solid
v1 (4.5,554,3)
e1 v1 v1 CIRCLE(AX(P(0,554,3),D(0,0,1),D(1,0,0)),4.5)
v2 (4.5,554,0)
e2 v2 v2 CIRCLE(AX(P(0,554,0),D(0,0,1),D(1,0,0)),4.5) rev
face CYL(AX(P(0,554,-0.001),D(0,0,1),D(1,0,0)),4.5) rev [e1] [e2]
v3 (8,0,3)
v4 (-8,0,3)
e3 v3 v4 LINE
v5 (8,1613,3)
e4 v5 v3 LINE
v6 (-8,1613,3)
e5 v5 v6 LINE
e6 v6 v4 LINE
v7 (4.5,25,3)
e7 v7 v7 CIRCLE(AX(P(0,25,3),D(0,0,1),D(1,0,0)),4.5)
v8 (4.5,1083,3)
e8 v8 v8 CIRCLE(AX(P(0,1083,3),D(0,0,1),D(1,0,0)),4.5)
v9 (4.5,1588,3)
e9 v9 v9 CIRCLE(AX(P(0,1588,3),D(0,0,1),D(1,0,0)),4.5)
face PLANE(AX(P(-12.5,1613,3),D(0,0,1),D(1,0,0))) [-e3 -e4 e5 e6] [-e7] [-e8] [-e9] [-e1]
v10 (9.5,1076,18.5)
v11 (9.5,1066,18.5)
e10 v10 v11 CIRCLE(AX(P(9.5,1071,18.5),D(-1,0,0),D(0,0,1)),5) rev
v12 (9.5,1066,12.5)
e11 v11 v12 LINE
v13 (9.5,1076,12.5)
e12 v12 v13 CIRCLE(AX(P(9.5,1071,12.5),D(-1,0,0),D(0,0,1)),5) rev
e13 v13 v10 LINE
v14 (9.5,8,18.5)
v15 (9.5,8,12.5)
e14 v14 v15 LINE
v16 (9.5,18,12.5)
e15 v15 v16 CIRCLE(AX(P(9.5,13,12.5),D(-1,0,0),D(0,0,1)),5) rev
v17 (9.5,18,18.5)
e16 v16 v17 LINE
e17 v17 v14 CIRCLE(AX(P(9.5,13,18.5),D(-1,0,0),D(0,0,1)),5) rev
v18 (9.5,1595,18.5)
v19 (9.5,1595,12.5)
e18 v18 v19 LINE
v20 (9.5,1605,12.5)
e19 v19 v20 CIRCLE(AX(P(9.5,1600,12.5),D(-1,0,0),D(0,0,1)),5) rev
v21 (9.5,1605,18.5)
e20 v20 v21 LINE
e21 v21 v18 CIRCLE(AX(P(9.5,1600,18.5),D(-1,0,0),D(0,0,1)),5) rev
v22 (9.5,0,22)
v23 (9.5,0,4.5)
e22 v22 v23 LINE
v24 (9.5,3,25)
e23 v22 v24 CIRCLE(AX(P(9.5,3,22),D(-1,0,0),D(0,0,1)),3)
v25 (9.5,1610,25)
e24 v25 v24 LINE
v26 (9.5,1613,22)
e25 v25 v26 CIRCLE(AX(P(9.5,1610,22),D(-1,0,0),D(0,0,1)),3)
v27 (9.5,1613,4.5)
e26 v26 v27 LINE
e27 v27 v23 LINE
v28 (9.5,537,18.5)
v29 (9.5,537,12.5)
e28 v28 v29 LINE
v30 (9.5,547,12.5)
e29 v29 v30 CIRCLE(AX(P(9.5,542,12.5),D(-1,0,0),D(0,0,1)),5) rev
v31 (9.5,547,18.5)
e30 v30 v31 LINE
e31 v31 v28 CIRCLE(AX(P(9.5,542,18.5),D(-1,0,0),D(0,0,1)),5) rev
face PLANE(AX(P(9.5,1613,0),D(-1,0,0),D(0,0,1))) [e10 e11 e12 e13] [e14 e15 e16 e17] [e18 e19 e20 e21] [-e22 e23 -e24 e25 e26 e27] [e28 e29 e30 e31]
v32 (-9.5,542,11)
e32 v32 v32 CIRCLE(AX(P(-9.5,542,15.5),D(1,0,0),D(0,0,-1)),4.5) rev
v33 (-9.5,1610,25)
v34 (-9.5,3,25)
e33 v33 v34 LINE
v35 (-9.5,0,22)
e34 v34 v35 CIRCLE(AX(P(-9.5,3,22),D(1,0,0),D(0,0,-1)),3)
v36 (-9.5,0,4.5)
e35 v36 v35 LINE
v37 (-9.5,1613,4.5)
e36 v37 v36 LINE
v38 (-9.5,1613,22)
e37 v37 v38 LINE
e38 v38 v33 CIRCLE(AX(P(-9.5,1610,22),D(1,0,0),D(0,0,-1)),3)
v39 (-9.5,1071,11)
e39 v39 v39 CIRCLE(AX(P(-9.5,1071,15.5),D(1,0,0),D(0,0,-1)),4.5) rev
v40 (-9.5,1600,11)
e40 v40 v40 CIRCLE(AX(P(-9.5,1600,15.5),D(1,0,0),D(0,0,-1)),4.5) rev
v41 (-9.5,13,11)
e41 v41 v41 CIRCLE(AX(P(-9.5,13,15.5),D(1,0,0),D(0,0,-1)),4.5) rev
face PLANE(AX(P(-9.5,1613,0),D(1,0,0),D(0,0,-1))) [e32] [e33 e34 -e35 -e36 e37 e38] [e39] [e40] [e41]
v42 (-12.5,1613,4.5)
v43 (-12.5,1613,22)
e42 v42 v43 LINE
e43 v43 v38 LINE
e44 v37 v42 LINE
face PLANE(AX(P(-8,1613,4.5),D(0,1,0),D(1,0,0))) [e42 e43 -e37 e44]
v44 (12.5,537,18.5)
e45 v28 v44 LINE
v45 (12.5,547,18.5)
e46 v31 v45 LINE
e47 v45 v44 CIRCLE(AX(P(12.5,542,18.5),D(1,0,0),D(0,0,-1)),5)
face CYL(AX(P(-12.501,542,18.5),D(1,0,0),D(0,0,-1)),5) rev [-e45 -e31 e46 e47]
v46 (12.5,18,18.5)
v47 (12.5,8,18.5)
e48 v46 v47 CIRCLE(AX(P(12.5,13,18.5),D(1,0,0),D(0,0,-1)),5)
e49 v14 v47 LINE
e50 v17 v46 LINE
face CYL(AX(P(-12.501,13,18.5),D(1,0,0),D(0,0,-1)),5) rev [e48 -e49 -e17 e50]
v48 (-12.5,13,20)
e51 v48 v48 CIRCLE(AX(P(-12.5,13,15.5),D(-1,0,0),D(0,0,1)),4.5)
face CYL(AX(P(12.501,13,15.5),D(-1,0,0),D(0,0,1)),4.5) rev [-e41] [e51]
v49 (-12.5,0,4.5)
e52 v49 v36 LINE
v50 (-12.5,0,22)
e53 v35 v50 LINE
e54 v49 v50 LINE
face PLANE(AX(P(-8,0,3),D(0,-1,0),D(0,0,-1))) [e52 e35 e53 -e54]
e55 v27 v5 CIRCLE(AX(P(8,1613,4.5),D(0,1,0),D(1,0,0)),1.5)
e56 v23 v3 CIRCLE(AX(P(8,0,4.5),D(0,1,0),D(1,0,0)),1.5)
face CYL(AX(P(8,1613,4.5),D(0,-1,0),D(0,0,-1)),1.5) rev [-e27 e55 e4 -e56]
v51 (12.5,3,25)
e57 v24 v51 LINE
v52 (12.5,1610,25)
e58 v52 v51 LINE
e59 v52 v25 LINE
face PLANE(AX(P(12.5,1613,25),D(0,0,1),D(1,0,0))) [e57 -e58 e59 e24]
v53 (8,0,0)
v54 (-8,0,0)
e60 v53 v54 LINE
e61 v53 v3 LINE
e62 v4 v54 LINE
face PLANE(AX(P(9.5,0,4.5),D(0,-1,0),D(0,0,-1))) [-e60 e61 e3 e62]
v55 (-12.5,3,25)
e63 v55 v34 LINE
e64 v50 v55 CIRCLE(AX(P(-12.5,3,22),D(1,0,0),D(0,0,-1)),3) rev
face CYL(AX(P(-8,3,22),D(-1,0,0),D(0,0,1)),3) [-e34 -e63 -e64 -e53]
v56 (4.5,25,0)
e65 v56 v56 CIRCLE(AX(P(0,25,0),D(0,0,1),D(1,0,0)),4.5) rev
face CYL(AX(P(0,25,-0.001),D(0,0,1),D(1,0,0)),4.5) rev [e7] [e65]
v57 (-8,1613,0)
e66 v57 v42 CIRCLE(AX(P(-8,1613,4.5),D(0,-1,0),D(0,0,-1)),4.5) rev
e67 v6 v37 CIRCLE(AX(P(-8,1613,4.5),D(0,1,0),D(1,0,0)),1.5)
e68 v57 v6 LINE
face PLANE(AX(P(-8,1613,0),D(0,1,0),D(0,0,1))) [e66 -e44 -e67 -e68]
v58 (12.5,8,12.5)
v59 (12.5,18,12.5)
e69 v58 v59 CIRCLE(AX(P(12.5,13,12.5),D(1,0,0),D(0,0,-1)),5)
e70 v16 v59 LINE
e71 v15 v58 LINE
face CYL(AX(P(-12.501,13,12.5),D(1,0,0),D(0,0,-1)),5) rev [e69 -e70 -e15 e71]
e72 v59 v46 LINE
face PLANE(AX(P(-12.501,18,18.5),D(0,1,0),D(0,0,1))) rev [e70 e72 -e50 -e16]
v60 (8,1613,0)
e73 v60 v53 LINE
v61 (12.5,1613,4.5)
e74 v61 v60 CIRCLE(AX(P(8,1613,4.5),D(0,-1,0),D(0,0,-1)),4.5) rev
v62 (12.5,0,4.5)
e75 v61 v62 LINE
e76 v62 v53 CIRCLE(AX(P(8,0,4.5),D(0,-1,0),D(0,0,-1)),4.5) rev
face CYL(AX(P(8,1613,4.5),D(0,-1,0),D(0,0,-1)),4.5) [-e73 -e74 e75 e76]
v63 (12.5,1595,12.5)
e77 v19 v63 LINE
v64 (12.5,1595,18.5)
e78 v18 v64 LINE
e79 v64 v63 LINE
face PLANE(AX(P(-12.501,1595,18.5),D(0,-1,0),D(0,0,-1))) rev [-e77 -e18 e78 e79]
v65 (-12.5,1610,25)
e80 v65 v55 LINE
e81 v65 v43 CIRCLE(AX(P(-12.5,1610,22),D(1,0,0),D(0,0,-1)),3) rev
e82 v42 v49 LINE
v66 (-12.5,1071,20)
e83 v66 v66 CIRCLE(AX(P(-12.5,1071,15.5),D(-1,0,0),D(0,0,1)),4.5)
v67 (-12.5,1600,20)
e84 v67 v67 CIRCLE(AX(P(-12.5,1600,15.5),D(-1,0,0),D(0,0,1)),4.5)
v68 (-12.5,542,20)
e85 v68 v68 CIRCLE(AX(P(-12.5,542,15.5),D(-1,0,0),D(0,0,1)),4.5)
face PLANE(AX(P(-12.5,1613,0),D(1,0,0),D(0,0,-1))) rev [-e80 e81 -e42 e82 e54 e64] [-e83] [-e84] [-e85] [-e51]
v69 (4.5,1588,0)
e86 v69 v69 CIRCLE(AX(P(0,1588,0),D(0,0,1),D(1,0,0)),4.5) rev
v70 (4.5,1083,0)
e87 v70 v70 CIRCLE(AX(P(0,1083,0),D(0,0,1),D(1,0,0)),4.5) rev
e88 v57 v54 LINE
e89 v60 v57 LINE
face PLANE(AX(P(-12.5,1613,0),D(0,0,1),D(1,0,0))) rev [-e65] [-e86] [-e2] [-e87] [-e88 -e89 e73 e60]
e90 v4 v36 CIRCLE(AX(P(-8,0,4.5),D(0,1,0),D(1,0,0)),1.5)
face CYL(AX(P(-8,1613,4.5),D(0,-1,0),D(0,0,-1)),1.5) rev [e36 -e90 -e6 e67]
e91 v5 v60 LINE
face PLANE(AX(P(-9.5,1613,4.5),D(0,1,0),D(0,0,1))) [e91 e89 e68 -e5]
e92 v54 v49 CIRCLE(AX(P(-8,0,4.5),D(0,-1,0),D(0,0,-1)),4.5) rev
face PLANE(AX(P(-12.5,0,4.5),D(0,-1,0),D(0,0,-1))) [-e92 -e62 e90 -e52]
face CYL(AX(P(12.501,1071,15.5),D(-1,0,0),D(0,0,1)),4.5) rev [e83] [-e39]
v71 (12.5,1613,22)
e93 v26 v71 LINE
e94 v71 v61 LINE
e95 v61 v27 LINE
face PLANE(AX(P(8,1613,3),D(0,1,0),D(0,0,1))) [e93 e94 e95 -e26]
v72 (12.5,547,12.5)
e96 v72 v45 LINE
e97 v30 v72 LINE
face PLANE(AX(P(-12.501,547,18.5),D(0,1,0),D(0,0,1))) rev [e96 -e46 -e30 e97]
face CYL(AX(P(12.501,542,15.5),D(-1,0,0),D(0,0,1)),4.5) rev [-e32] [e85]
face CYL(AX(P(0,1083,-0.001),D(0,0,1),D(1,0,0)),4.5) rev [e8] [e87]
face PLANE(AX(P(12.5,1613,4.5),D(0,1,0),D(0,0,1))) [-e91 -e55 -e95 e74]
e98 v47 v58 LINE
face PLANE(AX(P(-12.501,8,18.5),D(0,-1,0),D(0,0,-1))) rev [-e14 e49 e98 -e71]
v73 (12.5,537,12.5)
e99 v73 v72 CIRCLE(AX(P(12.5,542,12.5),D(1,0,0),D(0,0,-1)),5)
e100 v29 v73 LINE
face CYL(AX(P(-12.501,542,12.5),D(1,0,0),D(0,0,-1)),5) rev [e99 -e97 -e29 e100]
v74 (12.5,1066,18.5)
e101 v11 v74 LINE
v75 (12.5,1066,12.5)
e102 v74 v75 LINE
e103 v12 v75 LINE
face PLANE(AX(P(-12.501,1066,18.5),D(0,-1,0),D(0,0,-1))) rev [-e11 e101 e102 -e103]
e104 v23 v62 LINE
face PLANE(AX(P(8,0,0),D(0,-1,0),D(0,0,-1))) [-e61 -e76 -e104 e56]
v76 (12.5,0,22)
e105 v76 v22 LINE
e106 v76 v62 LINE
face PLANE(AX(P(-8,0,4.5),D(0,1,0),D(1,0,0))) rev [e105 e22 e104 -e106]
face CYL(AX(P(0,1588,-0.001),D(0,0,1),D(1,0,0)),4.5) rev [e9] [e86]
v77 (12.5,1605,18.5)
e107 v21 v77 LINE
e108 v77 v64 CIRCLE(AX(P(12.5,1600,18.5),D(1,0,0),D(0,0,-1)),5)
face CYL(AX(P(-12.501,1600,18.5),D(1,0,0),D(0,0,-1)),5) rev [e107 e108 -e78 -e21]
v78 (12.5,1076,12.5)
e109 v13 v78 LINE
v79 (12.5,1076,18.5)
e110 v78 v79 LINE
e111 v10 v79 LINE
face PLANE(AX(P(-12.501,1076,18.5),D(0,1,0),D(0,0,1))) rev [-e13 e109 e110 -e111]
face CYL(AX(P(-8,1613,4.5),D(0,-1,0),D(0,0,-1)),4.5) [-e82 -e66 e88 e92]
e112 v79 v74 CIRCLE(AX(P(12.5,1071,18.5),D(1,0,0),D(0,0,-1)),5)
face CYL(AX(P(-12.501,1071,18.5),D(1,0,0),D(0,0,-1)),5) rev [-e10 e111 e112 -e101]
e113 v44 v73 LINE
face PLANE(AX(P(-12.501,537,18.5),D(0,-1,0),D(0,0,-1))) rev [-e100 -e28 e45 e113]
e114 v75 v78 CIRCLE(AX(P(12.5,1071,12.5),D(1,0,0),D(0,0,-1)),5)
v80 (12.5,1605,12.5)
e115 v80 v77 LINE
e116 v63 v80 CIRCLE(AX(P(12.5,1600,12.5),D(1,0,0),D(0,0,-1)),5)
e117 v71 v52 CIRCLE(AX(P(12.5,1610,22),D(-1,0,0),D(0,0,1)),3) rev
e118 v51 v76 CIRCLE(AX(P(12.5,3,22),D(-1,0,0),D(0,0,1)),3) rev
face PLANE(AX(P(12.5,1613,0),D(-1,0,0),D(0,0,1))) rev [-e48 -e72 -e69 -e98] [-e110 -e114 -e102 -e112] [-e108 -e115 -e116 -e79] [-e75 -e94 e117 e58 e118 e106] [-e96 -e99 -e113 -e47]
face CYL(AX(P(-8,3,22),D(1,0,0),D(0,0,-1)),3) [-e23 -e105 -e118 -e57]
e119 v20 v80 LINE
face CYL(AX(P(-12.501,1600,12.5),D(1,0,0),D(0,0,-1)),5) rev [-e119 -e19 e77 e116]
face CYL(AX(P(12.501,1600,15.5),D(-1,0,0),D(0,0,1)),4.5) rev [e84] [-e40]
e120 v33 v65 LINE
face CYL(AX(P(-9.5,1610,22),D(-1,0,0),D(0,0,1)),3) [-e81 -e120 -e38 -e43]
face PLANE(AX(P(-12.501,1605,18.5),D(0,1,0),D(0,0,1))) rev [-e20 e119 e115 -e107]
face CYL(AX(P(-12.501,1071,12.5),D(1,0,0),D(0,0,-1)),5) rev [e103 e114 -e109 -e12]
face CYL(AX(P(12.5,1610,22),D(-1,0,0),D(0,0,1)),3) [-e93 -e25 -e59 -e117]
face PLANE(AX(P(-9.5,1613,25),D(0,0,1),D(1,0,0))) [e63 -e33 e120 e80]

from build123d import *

# Parameters (mm, degrees)
BASE_FLANGE1_DEPTH = 1613
CUT_EXTRUDE1_REACH = 1615.387
SKETCH6_R          = 4.5
FILLET1_R          = 3
CUT_EXTRUDE2_REACH = 1615.387
LPATTERN1_COUNT    = 4
LPATTERN1_PITCH    = 529
CUT_EXTRUDE3_REACH = 1615.198
SKETCH11_R         = 4.5
LPATTERN2_COUNT    = 3
LPATTERN2_PITCH    = 529
CUT_EXTRUDE4_REACH = 1615.198
SKETCH12_R         = 4.5


# Sheet-metal steps are written as plain solids
with BuildPart() as part:
    # Sketch1 → Base-Flange1 (new body)
    with BuildSketch(Plane(origin=(0, 0, 0), x_dir=(1, 0, 0), z_dir=(0, 1, 0))):
        with BuildLine():
            Line((-12.5, -25), (-12.5, -4.5))
            ThreePointArc((-12.5, -4.5), (-11.181980515, -1.318019485), (-8, 0))
            Line((-8, 0), (8, 0))
            ThreePointArc((8, 0), (11.181980515, -1.318019485), (12.5, -4.5))
            Line((12.5, -4.5), (12.5, -25))
            Line((12.5, -25), (9.5, -25))
            Line((9.5, -25), (9.5, -4.5))
            ThreePointArc((9.5, -4.5), (9.060660172, -3.439339828), (8, -3))
            Line((8, -3), (-8, -3))
            ThreePointArc((-8, -3), (-9.060660172, -3.439339828), (-9.5, -4.5))
            Line((-9.5, -4.5), (-9.5, -25))
            Line((-9.5, -25), (-12.5, -25))
        make_face()
    extrude(amount=BASE_FLANGE1_DEPTH)

    # Sketch6 → Cut-Extrude1 (cut, up to next)
    with BuildSketch(Plane.ZY.offset(12.5), mode=Mode.PRIVATE) as cut_extrude1_sk1:
        with Locations((15.5, 13)):
            Circle(SKETCH6_R)
    cut_extrude1_tool1 = extrude(cut_extrude1_sk1.sketch, amount=-CUT_EXTRUDE1_REACH, mode=Mode.PRIVATE) & part.part
    cut_extrude1 = cut_extrude1_tool1.solids().sort_by_distance((-12.5, 13, 15.5))[0]
    add(cut_extrude1, mode=Mode.SUBTRACT)

    # Fillet1
    fillet1_edges = [part.edges().sort_by_distance(p)[0] for p in [
        (11, 0, 25),
        (-11, 0, 25),
        (11, 1613, 25),
        (-11, 1613, 25),
    ]]
    fillet(fillet1_edges, radius=FILLET1_R)

    # Sketch7 → Cut-Extrude2 (cut, up to next)
    with BuildSketch(Plane(origin=(12.5, 0, 0), x_dir=(0, 0, -1), z_dir=(1, 0, 0)), mode=Mode.PRIVATE) as cut_extrude2_sk1:
        with BuildLine():
            Line((-18.5, 18), (-12.5, 18))
            ThreePointArc((-12.5, 18), (-7.5, 13), (-12.5, 8))
            Line((-12.5, 8), (-18.5, 8))
            ThreePointArc((-18.5, 8), (-23.5, 13), (-18.5, 18))
        make_face()
    cut_extrude2_tool1 = extrude(cut_extrude2_sk1.sketch, amount=-CUT_EXTRUDE2_REACH, mode=Mode.PRIVATE) & part.part
    cut_extrude2 = cut_extrude2_tool1.solids().sort_by_distance((12.5, 13, 15.5))[0]
    add(cut_extrude2, mode=Mode.SUBTRACT)

    # LPattern1: Cut-Extrude1, Cut-Extrude2 ×4
    with Locations(*[(0, i * LPATTERN1_PITCH, 0) for i in range(1, LPATTERN1_COUNT)]):
        add(cut_extrude1, mode=Mode.SUBTRACT)
        add(cut_extrude2, mode=Mode.SUBTRACT)

    # Sketch11 → Cut-Extrude3 (cut, up to next)
    with BuildSketch(Plane.XY.offset(3), mode=Mode.PRIVATE) as cut_extrude3_sk1:
        with Locations((0, 25)):
            Circle(SKETCH11_R)
    cut_extrude3_tool1 = extrude(cut_extrude3_sk1.sketch, amount=-CUT_EXTRUDE3_REACH, mode=Mode.PRIVATE) & part.part
    cut_extrude3 = cut_extrude3_tool1.solids().sort_by_distance((0, 25, 3))[0]
    add(cut_extrude3, mode=Mode.SUBTRACT)

    # LPattern2: Cut-Extrude3 ×3
    with Locations(*[(0, i * LPATTERN2_PITCH, 0) for i in range(1, LPATTERN2_COUNT)]):
        add(cut_extrude3, mode=Mode.SUBTRACT)

    # Sketch12 → Cut-Extrude4 (cut, up to next)
    with BuildSketch(Plane.XY.offset(3), mode=Mode.PRIVATE) as cut_extrude4_sk1:
        with Locations((0, 1588)):
            Circle(SKETCH12_R)
    cut_extrude4_tool1 = extrude(cut_extrude4_sk1.sketch, amount=-CUT_EXTRUDE4_REACH, mode=Mode.PRIVATE) & part.part
    add(cut_extrude4_tool1.solids().sort_by_distance((0, 1588, 3))[0], mode=Mode.SUBTRACT)


solid = part.part
